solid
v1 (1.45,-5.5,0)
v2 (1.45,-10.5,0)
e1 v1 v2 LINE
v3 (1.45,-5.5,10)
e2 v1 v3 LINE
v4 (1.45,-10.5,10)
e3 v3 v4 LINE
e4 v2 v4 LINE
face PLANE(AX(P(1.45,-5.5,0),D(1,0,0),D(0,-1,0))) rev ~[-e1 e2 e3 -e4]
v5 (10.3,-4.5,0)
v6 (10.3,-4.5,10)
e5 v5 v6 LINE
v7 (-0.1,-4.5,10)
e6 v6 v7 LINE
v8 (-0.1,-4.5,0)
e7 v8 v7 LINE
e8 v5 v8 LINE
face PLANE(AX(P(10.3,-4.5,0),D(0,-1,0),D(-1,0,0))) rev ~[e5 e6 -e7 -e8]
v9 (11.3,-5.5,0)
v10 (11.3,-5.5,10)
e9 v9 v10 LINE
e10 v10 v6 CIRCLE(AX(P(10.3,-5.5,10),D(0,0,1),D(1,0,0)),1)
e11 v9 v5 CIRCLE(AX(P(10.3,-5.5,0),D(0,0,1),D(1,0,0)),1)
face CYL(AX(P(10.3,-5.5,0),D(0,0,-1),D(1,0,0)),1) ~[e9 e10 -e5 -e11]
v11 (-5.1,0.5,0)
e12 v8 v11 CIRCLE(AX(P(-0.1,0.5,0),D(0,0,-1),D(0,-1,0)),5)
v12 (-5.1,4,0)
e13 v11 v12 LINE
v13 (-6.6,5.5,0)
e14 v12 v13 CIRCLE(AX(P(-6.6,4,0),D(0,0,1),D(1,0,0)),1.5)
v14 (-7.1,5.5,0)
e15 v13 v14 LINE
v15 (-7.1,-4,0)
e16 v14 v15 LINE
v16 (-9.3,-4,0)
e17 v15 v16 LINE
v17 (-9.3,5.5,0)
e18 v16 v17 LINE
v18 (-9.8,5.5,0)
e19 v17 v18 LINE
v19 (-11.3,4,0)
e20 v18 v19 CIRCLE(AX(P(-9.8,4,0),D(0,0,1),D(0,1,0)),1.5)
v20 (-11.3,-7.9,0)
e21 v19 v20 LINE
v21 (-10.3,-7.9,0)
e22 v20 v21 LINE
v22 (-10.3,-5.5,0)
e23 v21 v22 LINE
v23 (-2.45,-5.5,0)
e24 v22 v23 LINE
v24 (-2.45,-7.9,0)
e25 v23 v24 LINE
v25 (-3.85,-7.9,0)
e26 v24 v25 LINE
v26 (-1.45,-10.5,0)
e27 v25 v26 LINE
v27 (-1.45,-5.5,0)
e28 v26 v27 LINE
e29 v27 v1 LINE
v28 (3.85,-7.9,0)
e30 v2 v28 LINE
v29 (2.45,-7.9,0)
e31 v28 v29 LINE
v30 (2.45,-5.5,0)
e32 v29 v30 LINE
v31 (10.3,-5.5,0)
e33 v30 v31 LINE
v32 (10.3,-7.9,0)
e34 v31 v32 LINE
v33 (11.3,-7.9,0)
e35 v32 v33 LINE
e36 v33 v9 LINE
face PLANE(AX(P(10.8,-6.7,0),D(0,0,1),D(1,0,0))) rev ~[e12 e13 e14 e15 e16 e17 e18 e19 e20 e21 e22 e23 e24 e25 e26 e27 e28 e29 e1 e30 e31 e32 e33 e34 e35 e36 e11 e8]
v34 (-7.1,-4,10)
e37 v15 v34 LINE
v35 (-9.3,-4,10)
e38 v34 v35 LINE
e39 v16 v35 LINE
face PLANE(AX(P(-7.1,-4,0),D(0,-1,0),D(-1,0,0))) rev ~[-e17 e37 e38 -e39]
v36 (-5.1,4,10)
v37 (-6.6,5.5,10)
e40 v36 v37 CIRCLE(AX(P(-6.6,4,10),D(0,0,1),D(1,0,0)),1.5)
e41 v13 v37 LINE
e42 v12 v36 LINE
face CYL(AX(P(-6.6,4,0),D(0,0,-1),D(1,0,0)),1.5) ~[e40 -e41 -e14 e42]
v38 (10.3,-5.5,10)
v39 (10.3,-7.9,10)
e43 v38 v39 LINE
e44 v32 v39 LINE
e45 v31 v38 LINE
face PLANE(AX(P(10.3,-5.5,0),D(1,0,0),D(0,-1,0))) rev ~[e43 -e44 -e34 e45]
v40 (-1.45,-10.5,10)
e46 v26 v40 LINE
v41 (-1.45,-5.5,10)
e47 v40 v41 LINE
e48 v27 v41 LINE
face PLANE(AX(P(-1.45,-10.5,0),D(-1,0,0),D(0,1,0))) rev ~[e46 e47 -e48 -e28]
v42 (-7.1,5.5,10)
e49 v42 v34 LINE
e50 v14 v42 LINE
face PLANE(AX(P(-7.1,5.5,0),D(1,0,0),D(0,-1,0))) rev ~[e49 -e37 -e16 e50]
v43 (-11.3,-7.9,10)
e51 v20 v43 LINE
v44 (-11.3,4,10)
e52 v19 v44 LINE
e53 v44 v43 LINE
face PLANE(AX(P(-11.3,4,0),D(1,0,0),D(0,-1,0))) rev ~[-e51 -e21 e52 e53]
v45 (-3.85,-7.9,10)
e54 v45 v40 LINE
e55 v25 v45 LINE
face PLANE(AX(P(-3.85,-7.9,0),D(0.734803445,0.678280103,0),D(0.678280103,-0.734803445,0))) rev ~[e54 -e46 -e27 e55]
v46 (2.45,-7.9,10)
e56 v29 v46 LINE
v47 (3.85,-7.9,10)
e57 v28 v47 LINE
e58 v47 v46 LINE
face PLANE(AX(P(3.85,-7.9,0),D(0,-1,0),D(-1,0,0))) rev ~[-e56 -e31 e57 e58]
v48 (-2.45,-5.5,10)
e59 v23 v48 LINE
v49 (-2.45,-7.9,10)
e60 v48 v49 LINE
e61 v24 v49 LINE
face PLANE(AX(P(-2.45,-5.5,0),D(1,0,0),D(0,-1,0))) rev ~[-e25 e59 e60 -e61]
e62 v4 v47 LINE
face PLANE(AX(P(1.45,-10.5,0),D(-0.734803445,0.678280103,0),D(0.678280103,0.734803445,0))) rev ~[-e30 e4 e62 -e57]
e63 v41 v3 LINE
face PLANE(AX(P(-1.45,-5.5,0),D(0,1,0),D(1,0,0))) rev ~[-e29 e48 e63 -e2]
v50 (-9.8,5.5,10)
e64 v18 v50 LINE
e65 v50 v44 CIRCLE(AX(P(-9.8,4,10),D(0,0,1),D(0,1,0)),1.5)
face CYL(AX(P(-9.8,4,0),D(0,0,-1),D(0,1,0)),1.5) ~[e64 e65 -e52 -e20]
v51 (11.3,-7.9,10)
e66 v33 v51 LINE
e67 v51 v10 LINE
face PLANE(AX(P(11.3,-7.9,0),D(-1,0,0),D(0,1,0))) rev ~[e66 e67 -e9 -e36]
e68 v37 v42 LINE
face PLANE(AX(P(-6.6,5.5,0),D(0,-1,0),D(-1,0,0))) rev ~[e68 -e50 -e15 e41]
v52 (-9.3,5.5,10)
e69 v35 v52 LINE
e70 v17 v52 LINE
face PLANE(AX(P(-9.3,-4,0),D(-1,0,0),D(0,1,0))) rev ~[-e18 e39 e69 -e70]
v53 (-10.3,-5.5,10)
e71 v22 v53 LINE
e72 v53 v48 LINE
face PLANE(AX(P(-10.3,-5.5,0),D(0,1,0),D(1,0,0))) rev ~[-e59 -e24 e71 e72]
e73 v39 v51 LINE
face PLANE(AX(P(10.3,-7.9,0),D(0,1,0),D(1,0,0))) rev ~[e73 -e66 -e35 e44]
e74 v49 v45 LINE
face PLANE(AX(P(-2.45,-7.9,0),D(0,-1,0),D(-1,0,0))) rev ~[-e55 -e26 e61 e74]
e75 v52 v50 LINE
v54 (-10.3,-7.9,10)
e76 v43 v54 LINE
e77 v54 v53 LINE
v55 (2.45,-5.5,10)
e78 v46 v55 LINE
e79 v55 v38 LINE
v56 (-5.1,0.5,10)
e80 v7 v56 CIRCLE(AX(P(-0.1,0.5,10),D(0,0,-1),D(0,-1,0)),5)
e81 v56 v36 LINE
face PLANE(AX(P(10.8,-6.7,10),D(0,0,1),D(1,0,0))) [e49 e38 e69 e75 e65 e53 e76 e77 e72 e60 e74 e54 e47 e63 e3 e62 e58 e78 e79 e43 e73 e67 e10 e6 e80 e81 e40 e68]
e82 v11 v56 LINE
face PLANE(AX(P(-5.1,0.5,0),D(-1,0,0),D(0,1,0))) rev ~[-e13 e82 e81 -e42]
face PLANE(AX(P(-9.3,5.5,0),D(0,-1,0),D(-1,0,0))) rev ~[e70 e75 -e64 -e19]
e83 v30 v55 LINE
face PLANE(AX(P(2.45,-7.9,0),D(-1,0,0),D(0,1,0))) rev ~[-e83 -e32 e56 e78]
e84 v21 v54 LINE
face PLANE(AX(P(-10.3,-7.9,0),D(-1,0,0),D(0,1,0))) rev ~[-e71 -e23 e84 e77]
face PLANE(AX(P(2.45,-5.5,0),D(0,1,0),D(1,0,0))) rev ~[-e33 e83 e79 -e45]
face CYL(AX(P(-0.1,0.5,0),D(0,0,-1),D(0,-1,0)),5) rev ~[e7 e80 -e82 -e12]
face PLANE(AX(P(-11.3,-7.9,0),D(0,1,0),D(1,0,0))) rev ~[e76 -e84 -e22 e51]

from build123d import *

# Parameters (mm, degrees)
F0_W     = 1
F0_H     = 2.4
F1_DEPTH = 10


# Not quite as in the source:
# - a feature names something its author has since deleted; it is built from what else it names


with BuildPart() as f1:
    # F0 (on Top) → F1 (new body)
    with BuildSketch(Plane.XY):
        with Locations((10.8, -6.7)):
            Rectangle(F0_W, F0_H)
        with Locations((-10.8, -6.7)):
            Rectangle(F0_W, F0_H)
        Polygon((-2.45, -8.5), (-2.45, -7.9), (-3.85, -7.9), (-1.45, -10.5), (-1.45, -8.5), align=None)
        with BuildLine():
            Line((10.3, -4.5), (10.3, -5.5))
            Line((10.3, -5.5), (11.3, -5.5))
            ThreePointArc((11.3, -5.5), (11.0071067812, -4.7928932188), (10.3, -4.5))
        make_face()
        Polygon((-1.45, -5.5), (-2.45, -5.5), (-2.45, -7.9), (-2.45, -8.5), (-1.45, -8.5), align=None)
        Polygon((2.45, -5.5), (1.45, -5.5), (1.45, -8.5), (2.45, -8.5), (2.45, -7.9), align=None)
        with BuildLine():
            Line((-11.3, -5.5), (-10.3, -5.5))
            Line((-10.3, -5.5), (-2.45, -5.5))
            Line((-2.45, -5.5), (-1.45, -5.5))
            Line((-1.45, -5.5), (1.45, -5.5))
            Line((1.45, -5.5), (2.45, -5.5))
            Line((2.45, -5.5), (10.3, -5.5))
            Line((10.3, -5.5), (10.3, -4.5))
            Line((10.3, -4.5), (-0.1, -4.5))
            ThreePointArc((-0.1, -4.5), (-3.6355339059, -3.0355339059), (-5.1, 0.5))
            Line((-5.1, 0.5), (-5.1, 4))
            ThreePointArc((-5.1, 4), (-5.5393398282, 5.0606601718), (-6.6, 5.5))
            Line((-6.6, 5.5), (-7.1, 5.5))
            Line((-7.1, 5.5), (-7.1, -4))
            Line((-7.1, -4), (-9.3, -4))
            Line((-9.3, -4), (-9.3, 5.5))
            Line((-9.3, 5.5), (-9.8, 5.5))
            ThreePointArc((-9.8, 5.5), (-10.8606601718, 5.0606601718), (-11.3, 4))
            Line((-11.3, 4), (-11.3, -5.5))
        make_face()
        Polygon((2.45, -8.5), (1.45, -8.5), (1.45, -10.5), (3.85, -7.9), (2.45, -7.9), align=None)
    extrude(amount=F1_DEPTH)


solid = f1.part
